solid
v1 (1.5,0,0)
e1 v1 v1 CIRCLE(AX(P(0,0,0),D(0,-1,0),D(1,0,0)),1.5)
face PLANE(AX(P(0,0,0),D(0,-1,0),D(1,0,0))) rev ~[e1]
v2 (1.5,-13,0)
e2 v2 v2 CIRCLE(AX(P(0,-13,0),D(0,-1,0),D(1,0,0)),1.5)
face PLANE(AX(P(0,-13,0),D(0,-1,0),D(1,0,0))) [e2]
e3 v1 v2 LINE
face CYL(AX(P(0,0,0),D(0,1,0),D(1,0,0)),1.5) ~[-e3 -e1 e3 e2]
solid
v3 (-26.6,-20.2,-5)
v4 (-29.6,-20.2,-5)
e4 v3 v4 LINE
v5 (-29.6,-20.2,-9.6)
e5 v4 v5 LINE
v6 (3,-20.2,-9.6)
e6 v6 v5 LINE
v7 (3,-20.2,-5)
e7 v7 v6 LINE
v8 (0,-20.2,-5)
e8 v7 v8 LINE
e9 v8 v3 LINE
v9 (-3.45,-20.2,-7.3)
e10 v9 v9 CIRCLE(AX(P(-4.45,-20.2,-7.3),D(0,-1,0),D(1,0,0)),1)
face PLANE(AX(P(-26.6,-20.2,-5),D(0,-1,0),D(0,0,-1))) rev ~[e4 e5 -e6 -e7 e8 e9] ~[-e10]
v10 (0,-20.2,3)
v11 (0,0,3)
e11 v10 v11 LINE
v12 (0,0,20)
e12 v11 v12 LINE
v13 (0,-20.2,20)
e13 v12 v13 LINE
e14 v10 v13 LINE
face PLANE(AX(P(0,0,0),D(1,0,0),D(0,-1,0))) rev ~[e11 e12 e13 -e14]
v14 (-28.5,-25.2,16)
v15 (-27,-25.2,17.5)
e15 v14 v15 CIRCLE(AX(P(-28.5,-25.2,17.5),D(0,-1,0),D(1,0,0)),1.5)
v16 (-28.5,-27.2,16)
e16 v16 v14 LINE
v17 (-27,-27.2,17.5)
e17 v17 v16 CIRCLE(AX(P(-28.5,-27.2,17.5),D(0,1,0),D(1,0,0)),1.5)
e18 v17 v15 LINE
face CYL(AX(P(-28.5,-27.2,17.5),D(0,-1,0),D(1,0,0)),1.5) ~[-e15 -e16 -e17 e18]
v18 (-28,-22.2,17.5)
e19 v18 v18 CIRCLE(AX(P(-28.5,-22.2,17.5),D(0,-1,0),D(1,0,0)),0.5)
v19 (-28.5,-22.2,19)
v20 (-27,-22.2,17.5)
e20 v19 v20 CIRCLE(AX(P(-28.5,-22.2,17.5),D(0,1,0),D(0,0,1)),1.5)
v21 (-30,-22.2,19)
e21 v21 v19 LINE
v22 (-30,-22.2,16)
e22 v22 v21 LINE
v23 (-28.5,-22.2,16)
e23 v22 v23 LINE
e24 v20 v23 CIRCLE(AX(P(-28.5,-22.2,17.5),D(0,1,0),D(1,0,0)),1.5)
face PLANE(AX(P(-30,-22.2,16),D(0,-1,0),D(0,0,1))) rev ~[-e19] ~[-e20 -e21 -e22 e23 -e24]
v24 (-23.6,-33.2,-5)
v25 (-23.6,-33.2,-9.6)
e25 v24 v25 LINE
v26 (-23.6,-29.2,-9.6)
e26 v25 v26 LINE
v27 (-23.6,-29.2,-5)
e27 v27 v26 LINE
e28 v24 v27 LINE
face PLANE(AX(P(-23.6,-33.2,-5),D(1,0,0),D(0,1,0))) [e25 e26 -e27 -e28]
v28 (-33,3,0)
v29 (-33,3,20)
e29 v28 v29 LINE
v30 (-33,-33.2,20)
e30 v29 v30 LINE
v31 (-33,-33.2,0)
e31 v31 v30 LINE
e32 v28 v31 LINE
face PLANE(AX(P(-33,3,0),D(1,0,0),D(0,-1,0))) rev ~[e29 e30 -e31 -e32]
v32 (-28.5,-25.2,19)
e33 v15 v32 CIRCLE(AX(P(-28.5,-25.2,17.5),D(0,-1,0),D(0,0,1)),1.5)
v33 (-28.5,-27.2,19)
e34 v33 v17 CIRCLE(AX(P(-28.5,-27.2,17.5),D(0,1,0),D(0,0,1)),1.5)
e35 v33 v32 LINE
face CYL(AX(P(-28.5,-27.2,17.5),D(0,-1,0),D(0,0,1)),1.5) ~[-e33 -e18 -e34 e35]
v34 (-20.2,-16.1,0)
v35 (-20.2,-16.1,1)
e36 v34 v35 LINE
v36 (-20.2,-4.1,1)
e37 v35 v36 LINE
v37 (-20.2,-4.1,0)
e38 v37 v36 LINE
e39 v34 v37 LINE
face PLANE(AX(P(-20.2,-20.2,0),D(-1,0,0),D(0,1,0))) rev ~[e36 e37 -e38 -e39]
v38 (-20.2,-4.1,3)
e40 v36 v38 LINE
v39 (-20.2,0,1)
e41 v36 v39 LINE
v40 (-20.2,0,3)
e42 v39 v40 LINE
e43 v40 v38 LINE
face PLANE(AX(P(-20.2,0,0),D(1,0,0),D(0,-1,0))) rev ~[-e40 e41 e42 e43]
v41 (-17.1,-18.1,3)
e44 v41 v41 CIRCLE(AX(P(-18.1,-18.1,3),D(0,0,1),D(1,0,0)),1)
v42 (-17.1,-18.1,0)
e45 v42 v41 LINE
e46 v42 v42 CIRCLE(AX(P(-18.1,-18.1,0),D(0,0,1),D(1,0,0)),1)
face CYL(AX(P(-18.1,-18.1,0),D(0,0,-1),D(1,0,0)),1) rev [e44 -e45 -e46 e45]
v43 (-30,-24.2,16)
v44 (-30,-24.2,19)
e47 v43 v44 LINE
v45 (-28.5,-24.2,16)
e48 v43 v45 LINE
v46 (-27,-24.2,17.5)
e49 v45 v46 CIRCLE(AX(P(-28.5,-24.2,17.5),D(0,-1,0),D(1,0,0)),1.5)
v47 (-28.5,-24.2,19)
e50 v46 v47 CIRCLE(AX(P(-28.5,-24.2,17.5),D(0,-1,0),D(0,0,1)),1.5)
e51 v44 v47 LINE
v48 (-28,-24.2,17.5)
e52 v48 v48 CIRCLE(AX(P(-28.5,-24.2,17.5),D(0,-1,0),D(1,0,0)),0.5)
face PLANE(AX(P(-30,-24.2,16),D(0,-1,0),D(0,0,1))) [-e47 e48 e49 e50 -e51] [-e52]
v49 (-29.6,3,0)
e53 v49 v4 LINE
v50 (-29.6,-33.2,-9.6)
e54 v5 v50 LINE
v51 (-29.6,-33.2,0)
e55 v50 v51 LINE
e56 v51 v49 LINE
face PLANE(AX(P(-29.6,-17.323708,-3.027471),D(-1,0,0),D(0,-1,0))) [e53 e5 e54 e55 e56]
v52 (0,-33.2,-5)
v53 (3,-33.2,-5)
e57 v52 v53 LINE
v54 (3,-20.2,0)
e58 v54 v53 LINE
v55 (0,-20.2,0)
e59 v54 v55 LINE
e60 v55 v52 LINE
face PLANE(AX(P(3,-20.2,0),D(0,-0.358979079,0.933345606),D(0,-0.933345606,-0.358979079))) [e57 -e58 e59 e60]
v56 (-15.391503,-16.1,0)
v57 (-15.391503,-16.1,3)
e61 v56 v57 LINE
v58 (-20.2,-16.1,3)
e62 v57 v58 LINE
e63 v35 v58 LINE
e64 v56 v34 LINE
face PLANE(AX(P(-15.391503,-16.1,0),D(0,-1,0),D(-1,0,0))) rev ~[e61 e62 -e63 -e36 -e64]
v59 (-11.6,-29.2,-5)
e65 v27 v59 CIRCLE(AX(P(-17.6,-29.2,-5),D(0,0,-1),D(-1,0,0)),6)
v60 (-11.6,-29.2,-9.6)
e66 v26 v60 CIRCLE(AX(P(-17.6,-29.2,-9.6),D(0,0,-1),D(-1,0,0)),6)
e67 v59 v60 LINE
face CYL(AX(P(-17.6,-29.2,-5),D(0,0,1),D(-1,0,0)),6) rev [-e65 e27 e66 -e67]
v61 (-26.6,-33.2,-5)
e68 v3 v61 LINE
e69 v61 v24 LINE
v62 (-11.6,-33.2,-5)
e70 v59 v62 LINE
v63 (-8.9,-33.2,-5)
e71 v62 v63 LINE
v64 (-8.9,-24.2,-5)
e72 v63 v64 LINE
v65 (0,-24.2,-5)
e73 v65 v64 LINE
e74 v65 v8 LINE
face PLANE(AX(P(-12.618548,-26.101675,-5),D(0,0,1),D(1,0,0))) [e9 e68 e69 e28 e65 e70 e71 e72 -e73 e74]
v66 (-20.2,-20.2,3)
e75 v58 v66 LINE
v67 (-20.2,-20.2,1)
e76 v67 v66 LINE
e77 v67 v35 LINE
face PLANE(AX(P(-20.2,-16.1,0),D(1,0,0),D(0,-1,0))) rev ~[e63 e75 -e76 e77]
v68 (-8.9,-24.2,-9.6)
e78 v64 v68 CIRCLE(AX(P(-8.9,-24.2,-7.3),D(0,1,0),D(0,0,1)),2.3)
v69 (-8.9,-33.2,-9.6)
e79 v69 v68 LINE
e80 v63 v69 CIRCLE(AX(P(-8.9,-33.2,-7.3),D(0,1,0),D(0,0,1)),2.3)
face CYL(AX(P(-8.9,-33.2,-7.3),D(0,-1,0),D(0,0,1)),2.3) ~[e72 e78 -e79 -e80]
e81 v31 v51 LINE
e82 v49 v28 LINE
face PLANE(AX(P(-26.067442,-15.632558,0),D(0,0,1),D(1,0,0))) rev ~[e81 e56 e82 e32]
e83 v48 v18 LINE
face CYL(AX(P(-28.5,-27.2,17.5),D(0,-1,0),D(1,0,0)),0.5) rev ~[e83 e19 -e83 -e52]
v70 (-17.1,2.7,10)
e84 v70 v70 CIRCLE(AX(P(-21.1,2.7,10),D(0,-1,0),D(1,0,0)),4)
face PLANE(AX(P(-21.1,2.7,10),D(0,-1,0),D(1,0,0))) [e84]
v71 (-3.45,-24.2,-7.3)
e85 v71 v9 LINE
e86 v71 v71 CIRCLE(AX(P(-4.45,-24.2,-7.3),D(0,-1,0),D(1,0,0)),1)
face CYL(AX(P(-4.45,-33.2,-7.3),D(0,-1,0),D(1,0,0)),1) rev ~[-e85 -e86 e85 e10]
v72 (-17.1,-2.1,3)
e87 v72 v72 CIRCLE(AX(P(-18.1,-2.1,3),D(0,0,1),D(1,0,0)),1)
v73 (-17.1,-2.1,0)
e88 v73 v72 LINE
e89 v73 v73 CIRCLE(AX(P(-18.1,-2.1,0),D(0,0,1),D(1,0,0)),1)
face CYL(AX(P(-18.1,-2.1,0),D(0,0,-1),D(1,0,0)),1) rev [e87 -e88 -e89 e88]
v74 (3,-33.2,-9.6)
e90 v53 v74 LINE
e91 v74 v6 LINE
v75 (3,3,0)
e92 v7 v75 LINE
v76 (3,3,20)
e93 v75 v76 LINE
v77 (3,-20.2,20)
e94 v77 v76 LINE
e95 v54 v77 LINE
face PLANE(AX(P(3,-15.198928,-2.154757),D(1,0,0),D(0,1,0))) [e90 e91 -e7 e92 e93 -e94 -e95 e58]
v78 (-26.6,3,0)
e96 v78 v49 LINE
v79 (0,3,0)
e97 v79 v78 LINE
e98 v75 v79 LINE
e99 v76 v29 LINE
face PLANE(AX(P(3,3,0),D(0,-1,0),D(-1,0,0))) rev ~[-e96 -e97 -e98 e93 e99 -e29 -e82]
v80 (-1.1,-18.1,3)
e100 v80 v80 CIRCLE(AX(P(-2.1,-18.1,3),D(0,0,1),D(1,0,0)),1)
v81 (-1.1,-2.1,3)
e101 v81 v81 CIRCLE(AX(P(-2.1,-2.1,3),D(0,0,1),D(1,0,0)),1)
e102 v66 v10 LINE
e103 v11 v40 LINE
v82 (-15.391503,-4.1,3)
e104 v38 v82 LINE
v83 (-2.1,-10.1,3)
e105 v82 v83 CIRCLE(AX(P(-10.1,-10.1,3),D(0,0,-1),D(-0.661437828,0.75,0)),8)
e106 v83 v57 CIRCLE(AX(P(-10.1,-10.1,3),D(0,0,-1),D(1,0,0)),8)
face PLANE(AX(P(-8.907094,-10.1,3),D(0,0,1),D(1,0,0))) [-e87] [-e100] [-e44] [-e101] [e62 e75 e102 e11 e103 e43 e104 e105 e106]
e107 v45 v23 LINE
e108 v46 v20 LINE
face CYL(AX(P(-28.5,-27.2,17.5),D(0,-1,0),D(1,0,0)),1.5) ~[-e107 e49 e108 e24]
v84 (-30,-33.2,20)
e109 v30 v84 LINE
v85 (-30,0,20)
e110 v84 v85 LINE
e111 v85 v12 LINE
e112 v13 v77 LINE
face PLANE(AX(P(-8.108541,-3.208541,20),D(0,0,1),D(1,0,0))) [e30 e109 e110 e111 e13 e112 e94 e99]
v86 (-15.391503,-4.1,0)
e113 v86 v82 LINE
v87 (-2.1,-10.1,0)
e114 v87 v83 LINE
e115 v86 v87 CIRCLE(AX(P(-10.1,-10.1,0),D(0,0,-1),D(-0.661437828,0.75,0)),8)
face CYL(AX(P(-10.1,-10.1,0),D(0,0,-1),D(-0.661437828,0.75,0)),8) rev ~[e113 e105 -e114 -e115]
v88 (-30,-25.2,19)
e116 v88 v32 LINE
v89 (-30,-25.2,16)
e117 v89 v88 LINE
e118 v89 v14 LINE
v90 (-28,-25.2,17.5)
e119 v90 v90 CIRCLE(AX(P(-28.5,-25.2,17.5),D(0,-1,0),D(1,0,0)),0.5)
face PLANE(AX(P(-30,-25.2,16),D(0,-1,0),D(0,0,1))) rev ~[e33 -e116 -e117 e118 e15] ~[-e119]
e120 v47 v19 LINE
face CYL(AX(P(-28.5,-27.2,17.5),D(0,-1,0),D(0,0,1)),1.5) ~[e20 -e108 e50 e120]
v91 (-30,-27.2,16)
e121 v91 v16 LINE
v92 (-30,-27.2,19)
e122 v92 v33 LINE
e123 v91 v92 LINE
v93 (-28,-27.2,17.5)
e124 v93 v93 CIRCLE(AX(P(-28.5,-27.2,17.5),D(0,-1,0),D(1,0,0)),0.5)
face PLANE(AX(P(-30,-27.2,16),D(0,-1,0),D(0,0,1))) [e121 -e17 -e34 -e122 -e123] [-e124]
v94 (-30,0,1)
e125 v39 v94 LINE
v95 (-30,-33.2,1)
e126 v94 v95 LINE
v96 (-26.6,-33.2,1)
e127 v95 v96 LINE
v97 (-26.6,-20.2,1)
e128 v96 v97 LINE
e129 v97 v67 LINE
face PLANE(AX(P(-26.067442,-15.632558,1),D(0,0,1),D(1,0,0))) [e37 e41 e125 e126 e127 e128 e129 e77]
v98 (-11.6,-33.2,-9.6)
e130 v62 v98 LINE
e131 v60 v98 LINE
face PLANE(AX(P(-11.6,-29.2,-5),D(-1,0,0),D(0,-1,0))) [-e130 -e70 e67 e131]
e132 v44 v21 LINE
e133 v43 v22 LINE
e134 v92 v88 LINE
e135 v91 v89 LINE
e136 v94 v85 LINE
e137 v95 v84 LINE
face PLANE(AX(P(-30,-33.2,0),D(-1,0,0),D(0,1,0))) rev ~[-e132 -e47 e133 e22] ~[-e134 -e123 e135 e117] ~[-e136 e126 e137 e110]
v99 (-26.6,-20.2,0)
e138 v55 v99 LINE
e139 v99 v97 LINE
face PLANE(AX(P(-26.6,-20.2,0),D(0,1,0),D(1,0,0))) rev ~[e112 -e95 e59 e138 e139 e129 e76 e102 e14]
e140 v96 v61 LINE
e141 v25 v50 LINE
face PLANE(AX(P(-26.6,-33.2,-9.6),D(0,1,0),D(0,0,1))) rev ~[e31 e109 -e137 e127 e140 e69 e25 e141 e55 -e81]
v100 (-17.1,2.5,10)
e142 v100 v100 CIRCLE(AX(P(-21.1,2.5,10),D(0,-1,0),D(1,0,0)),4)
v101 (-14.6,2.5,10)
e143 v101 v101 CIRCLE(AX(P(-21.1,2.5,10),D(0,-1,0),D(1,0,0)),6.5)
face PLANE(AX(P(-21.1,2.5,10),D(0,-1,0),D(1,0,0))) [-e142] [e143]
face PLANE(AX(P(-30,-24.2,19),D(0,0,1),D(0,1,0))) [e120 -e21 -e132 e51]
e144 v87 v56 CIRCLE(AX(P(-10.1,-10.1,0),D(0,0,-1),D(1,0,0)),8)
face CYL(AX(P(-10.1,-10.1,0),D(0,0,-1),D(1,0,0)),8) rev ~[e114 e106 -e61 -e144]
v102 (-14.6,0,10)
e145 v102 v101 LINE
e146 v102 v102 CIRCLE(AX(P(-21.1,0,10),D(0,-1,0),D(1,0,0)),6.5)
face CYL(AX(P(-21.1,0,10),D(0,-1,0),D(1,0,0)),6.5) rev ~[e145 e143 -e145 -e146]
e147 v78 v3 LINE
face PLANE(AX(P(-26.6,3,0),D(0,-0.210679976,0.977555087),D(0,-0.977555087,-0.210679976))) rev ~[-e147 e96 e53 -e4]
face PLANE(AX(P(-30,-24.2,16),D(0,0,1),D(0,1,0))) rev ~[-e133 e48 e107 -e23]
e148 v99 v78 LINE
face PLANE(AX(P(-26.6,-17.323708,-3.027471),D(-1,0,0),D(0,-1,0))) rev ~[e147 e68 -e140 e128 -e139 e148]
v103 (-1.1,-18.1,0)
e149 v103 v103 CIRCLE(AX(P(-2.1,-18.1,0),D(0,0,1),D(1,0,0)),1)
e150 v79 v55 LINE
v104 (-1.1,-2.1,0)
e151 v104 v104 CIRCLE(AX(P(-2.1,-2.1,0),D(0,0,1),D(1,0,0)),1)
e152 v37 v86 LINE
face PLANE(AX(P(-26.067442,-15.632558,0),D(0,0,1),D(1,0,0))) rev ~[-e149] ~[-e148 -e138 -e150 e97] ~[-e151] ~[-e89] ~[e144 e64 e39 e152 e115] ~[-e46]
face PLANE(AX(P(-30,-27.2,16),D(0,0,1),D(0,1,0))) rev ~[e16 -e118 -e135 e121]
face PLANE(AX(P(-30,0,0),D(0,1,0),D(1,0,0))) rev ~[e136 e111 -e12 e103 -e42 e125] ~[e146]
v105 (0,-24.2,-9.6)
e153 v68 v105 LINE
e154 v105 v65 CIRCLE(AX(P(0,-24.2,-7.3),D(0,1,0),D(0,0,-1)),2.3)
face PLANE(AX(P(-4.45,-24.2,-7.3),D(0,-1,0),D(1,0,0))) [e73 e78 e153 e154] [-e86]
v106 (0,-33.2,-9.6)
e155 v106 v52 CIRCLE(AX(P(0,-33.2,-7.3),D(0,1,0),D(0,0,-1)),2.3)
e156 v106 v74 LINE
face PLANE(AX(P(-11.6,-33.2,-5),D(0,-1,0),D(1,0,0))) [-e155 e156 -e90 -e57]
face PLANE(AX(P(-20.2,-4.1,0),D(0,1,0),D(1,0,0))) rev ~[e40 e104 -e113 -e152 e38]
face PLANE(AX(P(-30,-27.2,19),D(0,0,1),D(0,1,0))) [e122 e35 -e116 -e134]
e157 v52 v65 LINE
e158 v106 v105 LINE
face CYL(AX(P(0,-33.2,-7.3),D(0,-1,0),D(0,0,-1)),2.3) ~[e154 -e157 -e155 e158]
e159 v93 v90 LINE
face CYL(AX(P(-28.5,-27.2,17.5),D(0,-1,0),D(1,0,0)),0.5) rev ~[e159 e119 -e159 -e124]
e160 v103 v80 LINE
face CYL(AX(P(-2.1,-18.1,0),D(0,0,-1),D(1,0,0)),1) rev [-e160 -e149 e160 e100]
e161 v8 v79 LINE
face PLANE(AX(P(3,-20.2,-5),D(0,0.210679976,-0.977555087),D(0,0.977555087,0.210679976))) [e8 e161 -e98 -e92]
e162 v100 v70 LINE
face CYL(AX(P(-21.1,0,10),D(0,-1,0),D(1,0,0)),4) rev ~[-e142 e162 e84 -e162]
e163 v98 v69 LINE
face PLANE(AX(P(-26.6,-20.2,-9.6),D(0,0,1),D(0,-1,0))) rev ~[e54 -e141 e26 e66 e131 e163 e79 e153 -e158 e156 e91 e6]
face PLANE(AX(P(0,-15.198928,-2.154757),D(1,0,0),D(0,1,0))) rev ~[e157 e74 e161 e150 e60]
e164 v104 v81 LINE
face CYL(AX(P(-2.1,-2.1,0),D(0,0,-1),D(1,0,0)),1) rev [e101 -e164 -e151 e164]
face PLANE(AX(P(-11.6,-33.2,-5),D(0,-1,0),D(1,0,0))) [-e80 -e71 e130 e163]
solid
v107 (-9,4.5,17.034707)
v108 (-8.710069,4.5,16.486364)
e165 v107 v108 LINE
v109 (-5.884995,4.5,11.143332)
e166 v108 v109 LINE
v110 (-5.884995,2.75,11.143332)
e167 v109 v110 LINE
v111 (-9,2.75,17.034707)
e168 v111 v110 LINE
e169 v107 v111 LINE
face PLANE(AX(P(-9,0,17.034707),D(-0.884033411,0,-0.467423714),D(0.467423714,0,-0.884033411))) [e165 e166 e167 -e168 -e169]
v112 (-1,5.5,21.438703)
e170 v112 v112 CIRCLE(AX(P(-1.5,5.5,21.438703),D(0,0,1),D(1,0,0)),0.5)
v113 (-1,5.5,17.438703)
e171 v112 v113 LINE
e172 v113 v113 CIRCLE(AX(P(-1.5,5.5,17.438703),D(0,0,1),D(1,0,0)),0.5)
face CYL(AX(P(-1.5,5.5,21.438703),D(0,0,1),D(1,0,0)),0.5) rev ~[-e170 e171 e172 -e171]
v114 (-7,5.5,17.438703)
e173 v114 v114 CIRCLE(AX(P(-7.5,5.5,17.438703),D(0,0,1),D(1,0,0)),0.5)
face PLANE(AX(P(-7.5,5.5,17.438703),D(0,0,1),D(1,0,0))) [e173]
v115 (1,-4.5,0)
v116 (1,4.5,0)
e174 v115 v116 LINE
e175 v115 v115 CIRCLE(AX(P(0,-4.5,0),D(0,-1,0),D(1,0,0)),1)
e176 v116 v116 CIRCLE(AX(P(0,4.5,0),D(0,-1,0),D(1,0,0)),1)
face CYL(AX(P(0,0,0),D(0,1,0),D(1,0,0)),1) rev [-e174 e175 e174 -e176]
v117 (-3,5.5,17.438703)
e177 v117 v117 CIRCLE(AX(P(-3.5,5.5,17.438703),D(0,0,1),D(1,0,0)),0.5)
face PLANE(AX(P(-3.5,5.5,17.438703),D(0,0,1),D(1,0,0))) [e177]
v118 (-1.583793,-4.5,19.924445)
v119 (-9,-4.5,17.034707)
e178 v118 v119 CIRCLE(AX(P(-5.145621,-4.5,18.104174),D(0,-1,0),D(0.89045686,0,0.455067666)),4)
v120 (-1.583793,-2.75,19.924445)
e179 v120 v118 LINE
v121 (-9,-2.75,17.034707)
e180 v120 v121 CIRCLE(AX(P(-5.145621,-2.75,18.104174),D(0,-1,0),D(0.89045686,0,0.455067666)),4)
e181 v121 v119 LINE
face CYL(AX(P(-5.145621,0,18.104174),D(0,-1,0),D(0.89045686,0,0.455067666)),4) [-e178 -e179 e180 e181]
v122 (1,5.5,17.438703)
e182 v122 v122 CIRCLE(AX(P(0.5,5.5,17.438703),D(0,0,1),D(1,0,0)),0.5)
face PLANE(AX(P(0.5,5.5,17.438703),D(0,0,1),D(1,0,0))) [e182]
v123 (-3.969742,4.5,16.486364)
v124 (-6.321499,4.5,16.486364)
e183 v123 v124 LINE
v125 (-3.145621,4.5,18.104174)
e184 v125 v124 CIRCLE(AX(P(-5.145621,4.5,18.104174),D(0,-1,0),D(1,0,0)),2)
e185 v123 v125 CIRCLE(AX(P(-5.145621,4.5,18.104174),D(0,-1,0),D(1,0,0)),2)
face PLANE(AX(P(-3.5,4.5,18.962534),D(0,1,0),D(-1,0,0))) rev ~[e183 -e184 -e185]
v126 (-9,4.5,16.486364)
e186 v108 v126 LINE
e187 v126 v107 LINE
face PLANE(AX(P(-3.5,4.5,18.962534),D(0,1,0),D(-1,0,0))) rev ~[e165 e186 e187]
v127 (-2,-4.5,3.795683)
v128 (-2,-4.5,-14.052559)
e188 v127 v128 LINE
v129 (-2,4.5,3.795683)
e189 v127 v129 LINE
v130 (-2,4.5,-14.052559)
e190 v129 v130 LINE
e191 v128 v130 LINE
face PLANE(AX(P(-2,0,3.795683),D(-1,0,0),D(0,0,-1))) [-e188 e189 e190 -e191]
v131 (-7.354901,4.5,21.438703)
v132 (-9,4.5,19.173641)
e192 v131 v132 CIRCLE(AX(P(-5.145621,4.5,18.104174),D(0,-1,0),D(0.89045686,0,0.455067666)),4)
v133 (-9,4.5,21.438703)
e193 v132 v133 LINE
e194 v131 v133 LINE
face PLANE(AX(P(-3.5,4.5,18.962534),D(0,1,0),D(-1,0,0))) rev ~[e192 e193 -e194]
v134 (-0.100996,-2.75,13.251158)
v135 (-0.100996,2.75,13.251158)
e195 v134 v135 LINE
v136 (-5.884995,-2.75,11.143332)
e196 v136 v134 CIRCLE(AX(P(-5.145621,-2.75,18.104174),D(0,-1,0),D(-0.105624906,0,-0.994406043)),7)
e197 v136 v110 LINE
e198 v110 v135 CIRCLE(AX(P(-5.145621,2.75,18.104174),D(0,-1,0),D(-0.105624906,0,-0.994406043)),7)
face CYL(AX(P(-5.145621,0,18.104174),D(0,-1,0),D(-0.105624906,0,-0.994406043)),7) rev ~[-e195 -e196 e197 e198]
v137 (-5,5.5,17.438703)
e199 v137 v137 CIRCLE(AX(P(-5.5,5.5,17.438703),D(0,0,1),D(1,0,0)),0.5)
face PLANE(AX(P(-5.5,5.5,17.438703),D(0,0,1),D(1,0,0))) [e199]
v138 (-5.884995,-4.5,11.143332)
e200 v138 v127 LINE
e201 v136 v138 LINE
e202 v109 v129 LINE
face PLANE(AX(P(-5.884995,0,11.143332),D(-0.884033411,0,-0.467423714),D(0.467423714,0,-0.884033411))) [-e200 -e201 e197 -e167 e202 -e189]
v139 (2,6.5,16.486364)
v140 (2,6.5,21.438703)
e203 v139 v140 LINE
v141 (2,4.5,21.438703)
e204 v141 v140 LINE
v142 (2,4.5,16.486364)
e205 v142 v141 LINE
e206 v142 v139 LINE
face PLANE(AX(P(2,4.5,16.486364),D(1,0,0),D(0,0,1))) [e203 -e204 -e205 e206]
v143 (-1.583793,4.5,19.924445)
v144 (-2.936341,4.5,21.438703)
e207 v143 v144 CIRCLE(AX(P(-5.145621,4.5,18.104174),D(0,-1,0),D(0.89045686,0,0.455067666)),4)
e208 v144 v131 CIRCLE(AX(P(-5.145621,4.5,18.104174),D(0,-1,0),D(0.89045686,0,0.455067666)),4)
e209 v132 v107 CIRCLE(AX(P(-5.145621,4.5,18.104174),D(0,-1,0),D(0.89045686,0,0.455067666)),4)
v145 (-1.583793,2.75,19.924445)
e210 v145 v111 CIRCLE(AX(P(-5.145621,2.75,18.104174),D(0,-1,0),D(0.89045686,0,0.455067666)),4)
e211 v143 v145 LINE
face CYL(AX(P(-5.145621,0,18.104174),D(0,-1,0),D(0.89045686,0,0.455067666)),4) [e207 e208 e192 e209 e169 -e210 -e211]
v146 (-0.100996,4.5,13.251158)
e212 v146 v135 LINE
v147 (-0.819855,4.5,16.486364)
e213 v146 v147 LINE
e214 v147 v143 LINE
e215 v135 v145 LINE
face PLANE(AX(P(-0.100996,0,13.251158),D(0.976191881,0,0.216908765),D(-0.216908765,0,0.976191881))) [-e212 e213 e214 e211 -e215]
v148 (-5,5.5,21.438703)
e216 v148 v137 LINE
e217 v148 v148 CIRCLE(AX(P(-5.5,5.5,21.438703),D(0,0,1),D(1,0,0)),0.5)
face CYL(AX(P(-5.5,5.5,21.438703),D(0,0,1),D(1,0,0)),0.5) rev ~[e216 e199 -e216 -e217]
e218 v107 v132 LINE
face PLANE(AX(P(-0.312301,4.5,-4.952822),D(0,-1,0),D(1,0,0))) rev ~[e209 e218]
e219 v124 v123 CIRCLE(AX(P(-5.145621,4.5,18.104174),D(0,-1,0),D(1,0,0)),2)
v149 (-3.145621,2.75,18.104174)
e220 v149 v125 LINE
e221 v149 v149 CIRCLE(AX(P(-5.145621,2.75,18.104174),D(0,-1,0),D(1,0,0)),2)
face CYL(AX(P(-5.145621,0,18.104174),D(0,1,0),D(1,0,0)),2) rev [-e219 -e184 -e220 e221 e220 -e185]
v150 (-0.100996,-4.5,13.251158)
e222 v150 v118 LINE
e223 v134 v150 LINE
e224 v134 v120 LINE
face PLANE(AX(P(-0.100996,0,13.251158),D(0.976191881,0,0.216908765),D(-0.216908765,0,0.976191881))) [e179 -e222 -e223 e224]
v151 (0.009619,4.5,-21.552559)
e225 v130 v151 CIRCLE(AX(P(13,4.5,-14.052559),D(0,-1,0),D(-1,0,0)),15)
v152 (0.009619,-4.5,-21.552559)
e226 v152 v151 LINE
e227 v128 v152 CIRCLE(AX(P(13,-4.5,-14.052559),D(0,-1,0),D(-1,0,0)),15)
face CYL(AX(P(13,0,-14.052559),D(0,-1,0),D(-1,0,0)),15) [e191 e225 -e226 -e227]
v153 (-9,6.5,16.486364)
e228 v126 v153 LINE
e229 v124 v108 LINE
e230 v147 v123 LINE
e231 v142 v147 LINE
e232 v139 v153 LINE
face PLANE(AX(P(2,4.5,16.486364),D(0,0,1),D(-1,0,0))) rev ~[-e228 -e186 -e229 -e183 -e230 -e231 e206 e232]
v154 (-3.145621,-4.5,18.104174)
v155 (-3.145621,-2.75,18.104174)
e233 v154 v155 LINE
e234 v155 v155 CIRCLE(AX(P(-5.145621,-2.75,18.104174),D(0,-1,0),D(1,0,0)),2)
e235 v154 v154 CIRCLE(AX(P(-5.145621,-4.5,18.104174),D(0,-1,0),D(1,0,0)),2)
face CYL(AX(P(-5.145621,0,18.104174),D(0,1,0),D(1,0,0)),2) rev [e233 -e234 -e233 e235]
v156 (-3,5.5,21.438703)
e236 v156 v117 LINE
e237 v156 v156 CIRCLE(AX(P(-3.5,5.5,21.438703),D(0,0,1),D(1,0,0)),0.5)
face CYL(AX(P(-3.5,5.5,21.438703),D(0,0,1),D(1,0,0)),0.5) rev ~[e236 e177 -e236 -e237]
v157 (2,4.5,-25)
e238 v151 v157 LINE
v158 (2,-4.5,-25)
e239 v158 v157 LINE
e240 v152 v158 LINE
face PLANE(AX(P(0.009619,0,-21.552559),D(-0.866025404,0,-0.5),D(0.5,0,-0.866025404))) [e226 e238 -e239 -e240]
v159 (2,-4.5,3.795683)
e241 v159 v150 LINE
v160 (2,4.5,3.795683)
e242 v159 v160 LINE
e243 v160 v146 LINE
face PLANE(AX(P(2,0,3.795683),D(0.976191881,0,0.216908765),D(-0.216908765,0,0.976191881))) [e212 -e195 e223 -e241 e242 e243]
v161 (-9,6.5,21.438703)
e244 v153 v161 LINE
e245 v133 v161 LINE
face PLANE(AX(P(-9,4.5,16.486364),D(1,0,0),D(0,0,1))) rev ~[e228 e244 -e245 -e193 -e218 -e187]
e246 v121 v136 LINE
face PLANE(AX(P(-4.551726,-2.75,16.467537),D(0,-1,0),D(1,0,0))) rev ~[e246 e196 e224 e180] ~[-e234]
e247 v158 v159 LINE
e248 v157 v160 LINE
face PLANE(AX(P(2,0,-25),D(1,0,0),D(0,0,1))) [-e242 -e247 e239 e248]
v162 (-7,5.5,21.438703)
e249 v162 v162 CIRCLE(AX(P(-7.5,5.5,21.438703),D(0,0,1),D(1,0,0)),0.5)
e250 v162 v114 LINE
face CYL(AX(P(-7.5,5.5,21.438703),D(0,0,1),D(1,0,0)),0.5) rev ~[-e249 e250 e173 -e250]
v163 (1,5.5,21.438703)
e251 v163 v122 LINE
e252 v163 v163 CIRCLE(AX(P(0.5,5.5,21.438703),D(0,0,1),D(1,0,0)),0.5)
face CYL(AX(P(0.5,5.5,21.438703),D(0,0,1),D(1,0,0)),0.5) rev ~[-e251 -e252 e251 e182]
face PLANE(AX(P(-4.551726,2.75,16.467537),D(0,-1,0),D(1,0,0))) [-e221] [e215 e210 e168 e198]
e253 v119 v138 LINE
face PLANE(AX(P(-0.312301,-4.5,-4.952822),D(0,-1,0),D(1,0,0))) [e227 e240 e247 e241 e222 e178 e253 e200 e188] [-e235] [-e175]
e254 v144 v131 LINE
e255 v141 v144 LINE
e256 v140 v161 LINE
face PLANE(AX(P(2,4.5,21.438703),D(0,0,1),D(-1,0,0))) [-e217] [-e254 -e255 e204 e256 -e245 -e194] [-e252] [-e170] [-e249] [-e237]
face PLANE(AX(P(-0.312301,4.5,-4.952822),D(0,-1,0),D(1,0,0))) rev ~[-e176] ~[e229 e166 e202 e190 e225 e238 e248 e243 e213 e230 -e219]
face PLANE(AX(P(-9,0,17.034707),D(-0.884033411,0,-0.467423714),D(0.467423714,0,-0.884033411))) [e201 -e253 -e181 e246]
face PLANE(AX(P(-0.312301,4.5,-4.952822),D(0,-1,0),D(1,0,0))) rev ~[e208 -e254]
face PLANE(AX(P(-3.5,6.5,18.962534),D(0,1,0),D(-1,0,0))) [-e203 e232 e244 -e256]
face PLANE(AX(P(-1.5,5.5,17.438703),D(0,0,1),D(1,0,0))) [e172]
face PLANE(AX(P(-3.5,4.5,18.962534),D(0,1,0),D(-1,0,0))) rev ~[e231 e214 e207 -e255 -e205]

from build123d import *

# Parameters (mm, degrees)
F1_DEPTH  = 20
F0_R      = 1
F2_DEPTH  = 3
F3_R      = 6.5
F3_R_2    = 4
F4_DEPTH  = 2.5
F5_DEPTH  = 2.7
F6_DEPTH  = 1
F9_DEPTH  = 4.6
F11_DEPTH = 3
F13_DEPTH = 3
F14_R     = 1
F14_R_2   = 2
F15_DEPTH = 4.5
F16_DEPTH = 2.75
F17_R     = 1.5
F18_DEPTH = 13
F19_W     = 2
F19_H     = 3
F20_DEPTH = 3
F21_R     = 0.5
F22_DEPTH = 5
F23_W     = 11
F23_H     = 4.9523387714
F24_DEPTH = 2
F25_R     = 0.5
F26_DEPTH = 4
F27_R     = 1
F28_DEPTH = 9
F29_DEPTH = 39.701


# Not quite as in the source:
# - a feature names something its author has since deleted; it is built from what else it names


with BuildPart() as f1:
    # F0 (on Top) → F1 (new body)
    with BuildSketch(Plane.XY):
        Polygon((-20.2, 0), (0, 0), (0, -20.2), (3, -20.2), (3, 3), (-30, 3), (-30, 0), align=None)
        Polygon((-30, -33.2), (-30, 0), (-30, 3), (-33, 3), (-33, -33.2), align=None)
    extrude(amount=F1_DEPTH)

    # F0 (on Top) → F2 (join)
    with BuildSketch(Plane.XY):
        with BuildLine():
            Line((0, -20.2), (0, 0))
            Line((0, 0), (-20.2, 0))
            Line((-20.2, 0), (-20.2, -4.1))
            Line((-20.2, -4.1), (-15.3915026221, -4.1))
            ThreePointArc((-15.3915026221, -4.1), (-6.8084973779, -2.8084973779), (-2.1, -10.1))
            ThreePointArc((-2.1, -10.1), (-6.8084973779, -17.3915026221), (-15.3915026221, -16.1))
            Line((-15.3915026221, -16.1), (-20.2, -16.1))
            Line((-20.2, -16.1), (-20.2, -20.2))
            Line((-20.2, -20.2), (-4, -20.2))
            Line((-4, -20.2), (0, -20.2))
        make_face()
        with Locations((-18.1, -18.1)):
            Circle(F0_R, mode=Mode.SUBTRACT)
        with Locations((-2.1, -18.1)):
            Circle(F0_R, mode=Mode.SUBTRACT)
        with Locations((-18.1, -2.1)):
            Circle(F0_R, mode=Mode.SUBTRACT)
        with Locations((-2.1, -2.1)):
            Circle(F0_R, mode=Mode.SUBTRACT)
    extrude(amount=F2_DEPTH)

    # F3 (on face) → F4 (cut)
    with BuildSketch(Plane.XZ):
        with Locations((-21.1, 10)):
            Circle(F3_R)
        with Locations((-21.1, 10)):
            Circle(F3_R_2, mode=Mode.SUBTRACT)
    extrude(amount=-F4_DEPTH, mode=Mode.SUBTRACT)

    # F3 (on face) → F5 (cut)
    with BuildSketch(Plane.XZ):
        with Locations((-21.1, 10)):
            Circle(F3_R_2)
    extrude(amount=-F5_DEPTH, mode=Mode.SUBTRACT)

    # F0 (on Top) → F6 (join)
    with BuildSketch(Plane.XY):
        Polygon((-20.2, -4.1), (-20.2, 0), (-30, 0), (-30, -33.2), (-26.6, -33.2), (-26.6, -20.2), (-20.2, -20.2), (-20.2, -16.1), align=None)
    extrude(amount=F6_DEPTH)



with BuildPart() as f9:
    # F8 (on offset) → F9 (new body)
    with BuildSketch(Plane.XY.offset(-5)):
        with BuildLine():
            Line((3, -33.2), (3, -20.2))
            Line((3, -20.2), (0, -20.2))
            Line((0, -20.2), (-4, -20.2))
            Line((-4, -20.2), (-20.2, -20.2))
            Line((-20.2, -20.2), (-26.6, -20.2))
            Line((-26.6, -20.2), (-26.6, -33.2))
            Line((-26.6, -33.2), (-23.6, -33.2))
            Line((-23.6, -33.2), (-23.6, -29.2))
            ThreePointArc((-23.6, -29.2), (-17.6, -23.2), (-11.6, -29.2))
            Line((-11.6, -29.2), (-11.6, -33.2))
            Line((-11.6, -33.2), (3, -33.2))
        make_face()
    extrude(amount=-F9_DEPTH)


with BuildPart() as f1_1:
    add(f1.part)

    add(f9.part)  # F11 merges F9
    # F10 (on face) → F11 (join)
    with BuildSketch(Plane.YZ.offset(3)):
        Polygon((3, 0), (-20.2, 0), (-33.2, -5), (-20.2, -5), align=None)
    extrude(amount=-F11_DEPTH)

    # F12 (on face) → F13 (join)
    with BuildSketch(Plane(origin=(-26.6, 0, 0), x_dir=(0, -1, 0), z_dir=(-1, 0, 0))):
        Polygon((33.2, 0), (-3, 0), (20.2, -5), (20.2, -9.6), (33.2, -9.6), (33.2, -5), align=None)
    extrude(amount=F13_DEPTH)

    # F19 (on face) → F20 (join)
    with BuildSketch(Plane.YZ.offset(-30)):
        with Locations((-26.2, 17.5)):
            Rectangle(F19_W, F19_H)
        with Locations((-23.2, 17.5)):
            Rectangle(F19_W, F19_H)
    extrude(amount=F20_DEPTH)

    # F21 (on face) → F22 (cut, through all)
    with BuildSketch(Plane.XZ.offset(27.2)):
        with Locations((-28.5, 17.5)):
            Circle(F21_R)
        with BuildLine():
            ThreePointArc((-28.5, 19), (-27.4393398282, 18.5606601718), (-27, 17.5))
            Line((-27, 17.5), (-27, 19))
            Line((-27, 19), (-28.5, 19))
        make_face()
        with BuildLine():
            ThreePointArc((-27, 17.5), (-27.4393398282, 16.4393398282), (-28.5, 16))
            Line((-28.5, 16), (-27, 16))
            Line((-27, 16), (-27, 17.5))
        make_face()
    extrude(amount=-F22_DEPTH, mode=Mode.SUBTRACT)

    # F27 (on face) → F28 (cut)
    with BuildSketch(Plane.XZ.offset(33.2)):
        with BuildLine():
            Line((0, -5), (-8.9, -5))
            ThreePointArc((-8.9, -5), (-6.6, -7.3), (-8.9, -9.6))
            Line((-8.9, -9.6), (0, -9.6))
            ThreePointArc((0, -9.6), (-2.3, -7.3), (0, -5))
        make_face()
        with Locations((-4.45, -7.3)):
            Circle(F27_R, mode=Mode.SUBTRACT)
        with Locations((-4.45, -7.3)):
            Circle(F27_R)
    extrude(amount=-F28_DEPTH, mode=Mode.SUBTRACT)

    # F27 (on face) → F29 (cut, through all)
    with BuildSketch(Plane.XZ.offset(33.2)):
        with Locations((-4.45, -7.3)):
            Circle(F27_R)
    extrude(amount=-F29_DEPTH, mode=Mode.SUBTRACT)


with BuildPart() as f15:
    # F14 (on Front) → F15 (new body, symmetric)
    with BuildSketch(Plane.XZ):
        with BuildLine():
            Line((2, 3.7956831511), (-0.1009962226, 13.2511583937))
            ThreePointArc((-0.1009962226, 13.2511583937), (-2.7488462539, 11.5272851379), (-5.8849949849, 11.1433321096))
            Line((-5.8849949849, 11.1433321096), (-2, 3.7956831511))
            Line((-2, 3.7956831511), (-2, -14.0525588833))
            ThreePointArc((-2, -14.0525588833), (-1.4888873943, -17.9348445598), (0.0096189432, -21.5525588833))
            Line((0.0096189432, -21.5525588833), (2, -25))
            Line((2, -25), (2, 3.7956831511))
        make_face()
        Circle(F14_R, mode=Mode.SUBTRACT)
        with BuildLine():
            Line((-0.1009962226, 13.2511583937), (-1.5837932006, 19.9244450778))
            ThreePointArc((-1.5837932006, 19.9244450778), (-6.5978749759, 21.8312318779), (-9, 17.0347073736))
            Line((-9, 17.0347073736), (-5.8849949849, 11.1433321096))
            ThreePointArc((-5.8849949849, 11.1433321096), (-2.7488462539, 11.5272851379), (-0.1009962226, 13.2511583937))
        make_face()
        with Locations((-5.14562064, 18.1041744134)):
            Circle(F14_R_2, mode=Mode.SUBTRACT)
    extrude(amount=F15_DEPTH, both=True)

    # F14 (on Front) → F16 (cut, symmetric)
    with BuildSketch(Plane.XZ):
        with BuildLine():
            Line((-0.1009962226, 13.2511583937), (-1.5837932006, 19.9244450778))
            ThreePointArc((-1.5837932006, 19.9244450778), (-6.5978749759, 21.8312318779), (-9, 17.0347073736))
            Line((-9, 17.0347073736), (-5.8849949849, 11.1433321096))
            ThreePointArc((-5.8849949849, 11.1433321096), (-2.7488462539, 11.5272851379), (-0.1009962226, 13.2511583937))
        make_face()
        with Locations((-5.14562064, 18.1041744134)):
            Circle(F14_R_2, mode=Mode.SUBTRACT)
    extrude(amount=F16_DEPTH, both=True, mode=Mode.SUBTRACT)

    # F23 (on face) → F24 (join)
    with BuildSketch(Plane(origin=(0, 4.5, 0), x_dir=(-1, 0, 0), z_dir=(0, 1, 0))):
        with Locations((3.5, 18.9625336896)):
            Rectangle(F23_W, F23_H)
    extrude(amount=F24_DEPTH)

    # F25 (on face) → F26 (cut)
    with BuildSketch(Plane.XY.offset(21.4387030753)):
        with Locations((0.5, 5.5)):
            Circle(F25_R)
        with Locations((-1.5, 5.5)):
            Circle(F25_R)
        with Locations((-3.5, 5.5)):
            Circle(F25_R)
        with Locations((-5.5, 5.5)):
            Circle(F25_R)
        with Locations((-7.5, 5.5)):
            Circle(F25_R)
    extrude(amount=-F26_DEPTH, mode=Mode.SUBTRACT)


with BuildPart() as f18:
    # F17 (on Front) → F18 (new body)
    with BuildSketch(Plane.XZ):
        Circle(F17_R)
    extrude(amount=F18_DEPTH)


solid = Compound([f1_1.part, f15.part, f18.part])
